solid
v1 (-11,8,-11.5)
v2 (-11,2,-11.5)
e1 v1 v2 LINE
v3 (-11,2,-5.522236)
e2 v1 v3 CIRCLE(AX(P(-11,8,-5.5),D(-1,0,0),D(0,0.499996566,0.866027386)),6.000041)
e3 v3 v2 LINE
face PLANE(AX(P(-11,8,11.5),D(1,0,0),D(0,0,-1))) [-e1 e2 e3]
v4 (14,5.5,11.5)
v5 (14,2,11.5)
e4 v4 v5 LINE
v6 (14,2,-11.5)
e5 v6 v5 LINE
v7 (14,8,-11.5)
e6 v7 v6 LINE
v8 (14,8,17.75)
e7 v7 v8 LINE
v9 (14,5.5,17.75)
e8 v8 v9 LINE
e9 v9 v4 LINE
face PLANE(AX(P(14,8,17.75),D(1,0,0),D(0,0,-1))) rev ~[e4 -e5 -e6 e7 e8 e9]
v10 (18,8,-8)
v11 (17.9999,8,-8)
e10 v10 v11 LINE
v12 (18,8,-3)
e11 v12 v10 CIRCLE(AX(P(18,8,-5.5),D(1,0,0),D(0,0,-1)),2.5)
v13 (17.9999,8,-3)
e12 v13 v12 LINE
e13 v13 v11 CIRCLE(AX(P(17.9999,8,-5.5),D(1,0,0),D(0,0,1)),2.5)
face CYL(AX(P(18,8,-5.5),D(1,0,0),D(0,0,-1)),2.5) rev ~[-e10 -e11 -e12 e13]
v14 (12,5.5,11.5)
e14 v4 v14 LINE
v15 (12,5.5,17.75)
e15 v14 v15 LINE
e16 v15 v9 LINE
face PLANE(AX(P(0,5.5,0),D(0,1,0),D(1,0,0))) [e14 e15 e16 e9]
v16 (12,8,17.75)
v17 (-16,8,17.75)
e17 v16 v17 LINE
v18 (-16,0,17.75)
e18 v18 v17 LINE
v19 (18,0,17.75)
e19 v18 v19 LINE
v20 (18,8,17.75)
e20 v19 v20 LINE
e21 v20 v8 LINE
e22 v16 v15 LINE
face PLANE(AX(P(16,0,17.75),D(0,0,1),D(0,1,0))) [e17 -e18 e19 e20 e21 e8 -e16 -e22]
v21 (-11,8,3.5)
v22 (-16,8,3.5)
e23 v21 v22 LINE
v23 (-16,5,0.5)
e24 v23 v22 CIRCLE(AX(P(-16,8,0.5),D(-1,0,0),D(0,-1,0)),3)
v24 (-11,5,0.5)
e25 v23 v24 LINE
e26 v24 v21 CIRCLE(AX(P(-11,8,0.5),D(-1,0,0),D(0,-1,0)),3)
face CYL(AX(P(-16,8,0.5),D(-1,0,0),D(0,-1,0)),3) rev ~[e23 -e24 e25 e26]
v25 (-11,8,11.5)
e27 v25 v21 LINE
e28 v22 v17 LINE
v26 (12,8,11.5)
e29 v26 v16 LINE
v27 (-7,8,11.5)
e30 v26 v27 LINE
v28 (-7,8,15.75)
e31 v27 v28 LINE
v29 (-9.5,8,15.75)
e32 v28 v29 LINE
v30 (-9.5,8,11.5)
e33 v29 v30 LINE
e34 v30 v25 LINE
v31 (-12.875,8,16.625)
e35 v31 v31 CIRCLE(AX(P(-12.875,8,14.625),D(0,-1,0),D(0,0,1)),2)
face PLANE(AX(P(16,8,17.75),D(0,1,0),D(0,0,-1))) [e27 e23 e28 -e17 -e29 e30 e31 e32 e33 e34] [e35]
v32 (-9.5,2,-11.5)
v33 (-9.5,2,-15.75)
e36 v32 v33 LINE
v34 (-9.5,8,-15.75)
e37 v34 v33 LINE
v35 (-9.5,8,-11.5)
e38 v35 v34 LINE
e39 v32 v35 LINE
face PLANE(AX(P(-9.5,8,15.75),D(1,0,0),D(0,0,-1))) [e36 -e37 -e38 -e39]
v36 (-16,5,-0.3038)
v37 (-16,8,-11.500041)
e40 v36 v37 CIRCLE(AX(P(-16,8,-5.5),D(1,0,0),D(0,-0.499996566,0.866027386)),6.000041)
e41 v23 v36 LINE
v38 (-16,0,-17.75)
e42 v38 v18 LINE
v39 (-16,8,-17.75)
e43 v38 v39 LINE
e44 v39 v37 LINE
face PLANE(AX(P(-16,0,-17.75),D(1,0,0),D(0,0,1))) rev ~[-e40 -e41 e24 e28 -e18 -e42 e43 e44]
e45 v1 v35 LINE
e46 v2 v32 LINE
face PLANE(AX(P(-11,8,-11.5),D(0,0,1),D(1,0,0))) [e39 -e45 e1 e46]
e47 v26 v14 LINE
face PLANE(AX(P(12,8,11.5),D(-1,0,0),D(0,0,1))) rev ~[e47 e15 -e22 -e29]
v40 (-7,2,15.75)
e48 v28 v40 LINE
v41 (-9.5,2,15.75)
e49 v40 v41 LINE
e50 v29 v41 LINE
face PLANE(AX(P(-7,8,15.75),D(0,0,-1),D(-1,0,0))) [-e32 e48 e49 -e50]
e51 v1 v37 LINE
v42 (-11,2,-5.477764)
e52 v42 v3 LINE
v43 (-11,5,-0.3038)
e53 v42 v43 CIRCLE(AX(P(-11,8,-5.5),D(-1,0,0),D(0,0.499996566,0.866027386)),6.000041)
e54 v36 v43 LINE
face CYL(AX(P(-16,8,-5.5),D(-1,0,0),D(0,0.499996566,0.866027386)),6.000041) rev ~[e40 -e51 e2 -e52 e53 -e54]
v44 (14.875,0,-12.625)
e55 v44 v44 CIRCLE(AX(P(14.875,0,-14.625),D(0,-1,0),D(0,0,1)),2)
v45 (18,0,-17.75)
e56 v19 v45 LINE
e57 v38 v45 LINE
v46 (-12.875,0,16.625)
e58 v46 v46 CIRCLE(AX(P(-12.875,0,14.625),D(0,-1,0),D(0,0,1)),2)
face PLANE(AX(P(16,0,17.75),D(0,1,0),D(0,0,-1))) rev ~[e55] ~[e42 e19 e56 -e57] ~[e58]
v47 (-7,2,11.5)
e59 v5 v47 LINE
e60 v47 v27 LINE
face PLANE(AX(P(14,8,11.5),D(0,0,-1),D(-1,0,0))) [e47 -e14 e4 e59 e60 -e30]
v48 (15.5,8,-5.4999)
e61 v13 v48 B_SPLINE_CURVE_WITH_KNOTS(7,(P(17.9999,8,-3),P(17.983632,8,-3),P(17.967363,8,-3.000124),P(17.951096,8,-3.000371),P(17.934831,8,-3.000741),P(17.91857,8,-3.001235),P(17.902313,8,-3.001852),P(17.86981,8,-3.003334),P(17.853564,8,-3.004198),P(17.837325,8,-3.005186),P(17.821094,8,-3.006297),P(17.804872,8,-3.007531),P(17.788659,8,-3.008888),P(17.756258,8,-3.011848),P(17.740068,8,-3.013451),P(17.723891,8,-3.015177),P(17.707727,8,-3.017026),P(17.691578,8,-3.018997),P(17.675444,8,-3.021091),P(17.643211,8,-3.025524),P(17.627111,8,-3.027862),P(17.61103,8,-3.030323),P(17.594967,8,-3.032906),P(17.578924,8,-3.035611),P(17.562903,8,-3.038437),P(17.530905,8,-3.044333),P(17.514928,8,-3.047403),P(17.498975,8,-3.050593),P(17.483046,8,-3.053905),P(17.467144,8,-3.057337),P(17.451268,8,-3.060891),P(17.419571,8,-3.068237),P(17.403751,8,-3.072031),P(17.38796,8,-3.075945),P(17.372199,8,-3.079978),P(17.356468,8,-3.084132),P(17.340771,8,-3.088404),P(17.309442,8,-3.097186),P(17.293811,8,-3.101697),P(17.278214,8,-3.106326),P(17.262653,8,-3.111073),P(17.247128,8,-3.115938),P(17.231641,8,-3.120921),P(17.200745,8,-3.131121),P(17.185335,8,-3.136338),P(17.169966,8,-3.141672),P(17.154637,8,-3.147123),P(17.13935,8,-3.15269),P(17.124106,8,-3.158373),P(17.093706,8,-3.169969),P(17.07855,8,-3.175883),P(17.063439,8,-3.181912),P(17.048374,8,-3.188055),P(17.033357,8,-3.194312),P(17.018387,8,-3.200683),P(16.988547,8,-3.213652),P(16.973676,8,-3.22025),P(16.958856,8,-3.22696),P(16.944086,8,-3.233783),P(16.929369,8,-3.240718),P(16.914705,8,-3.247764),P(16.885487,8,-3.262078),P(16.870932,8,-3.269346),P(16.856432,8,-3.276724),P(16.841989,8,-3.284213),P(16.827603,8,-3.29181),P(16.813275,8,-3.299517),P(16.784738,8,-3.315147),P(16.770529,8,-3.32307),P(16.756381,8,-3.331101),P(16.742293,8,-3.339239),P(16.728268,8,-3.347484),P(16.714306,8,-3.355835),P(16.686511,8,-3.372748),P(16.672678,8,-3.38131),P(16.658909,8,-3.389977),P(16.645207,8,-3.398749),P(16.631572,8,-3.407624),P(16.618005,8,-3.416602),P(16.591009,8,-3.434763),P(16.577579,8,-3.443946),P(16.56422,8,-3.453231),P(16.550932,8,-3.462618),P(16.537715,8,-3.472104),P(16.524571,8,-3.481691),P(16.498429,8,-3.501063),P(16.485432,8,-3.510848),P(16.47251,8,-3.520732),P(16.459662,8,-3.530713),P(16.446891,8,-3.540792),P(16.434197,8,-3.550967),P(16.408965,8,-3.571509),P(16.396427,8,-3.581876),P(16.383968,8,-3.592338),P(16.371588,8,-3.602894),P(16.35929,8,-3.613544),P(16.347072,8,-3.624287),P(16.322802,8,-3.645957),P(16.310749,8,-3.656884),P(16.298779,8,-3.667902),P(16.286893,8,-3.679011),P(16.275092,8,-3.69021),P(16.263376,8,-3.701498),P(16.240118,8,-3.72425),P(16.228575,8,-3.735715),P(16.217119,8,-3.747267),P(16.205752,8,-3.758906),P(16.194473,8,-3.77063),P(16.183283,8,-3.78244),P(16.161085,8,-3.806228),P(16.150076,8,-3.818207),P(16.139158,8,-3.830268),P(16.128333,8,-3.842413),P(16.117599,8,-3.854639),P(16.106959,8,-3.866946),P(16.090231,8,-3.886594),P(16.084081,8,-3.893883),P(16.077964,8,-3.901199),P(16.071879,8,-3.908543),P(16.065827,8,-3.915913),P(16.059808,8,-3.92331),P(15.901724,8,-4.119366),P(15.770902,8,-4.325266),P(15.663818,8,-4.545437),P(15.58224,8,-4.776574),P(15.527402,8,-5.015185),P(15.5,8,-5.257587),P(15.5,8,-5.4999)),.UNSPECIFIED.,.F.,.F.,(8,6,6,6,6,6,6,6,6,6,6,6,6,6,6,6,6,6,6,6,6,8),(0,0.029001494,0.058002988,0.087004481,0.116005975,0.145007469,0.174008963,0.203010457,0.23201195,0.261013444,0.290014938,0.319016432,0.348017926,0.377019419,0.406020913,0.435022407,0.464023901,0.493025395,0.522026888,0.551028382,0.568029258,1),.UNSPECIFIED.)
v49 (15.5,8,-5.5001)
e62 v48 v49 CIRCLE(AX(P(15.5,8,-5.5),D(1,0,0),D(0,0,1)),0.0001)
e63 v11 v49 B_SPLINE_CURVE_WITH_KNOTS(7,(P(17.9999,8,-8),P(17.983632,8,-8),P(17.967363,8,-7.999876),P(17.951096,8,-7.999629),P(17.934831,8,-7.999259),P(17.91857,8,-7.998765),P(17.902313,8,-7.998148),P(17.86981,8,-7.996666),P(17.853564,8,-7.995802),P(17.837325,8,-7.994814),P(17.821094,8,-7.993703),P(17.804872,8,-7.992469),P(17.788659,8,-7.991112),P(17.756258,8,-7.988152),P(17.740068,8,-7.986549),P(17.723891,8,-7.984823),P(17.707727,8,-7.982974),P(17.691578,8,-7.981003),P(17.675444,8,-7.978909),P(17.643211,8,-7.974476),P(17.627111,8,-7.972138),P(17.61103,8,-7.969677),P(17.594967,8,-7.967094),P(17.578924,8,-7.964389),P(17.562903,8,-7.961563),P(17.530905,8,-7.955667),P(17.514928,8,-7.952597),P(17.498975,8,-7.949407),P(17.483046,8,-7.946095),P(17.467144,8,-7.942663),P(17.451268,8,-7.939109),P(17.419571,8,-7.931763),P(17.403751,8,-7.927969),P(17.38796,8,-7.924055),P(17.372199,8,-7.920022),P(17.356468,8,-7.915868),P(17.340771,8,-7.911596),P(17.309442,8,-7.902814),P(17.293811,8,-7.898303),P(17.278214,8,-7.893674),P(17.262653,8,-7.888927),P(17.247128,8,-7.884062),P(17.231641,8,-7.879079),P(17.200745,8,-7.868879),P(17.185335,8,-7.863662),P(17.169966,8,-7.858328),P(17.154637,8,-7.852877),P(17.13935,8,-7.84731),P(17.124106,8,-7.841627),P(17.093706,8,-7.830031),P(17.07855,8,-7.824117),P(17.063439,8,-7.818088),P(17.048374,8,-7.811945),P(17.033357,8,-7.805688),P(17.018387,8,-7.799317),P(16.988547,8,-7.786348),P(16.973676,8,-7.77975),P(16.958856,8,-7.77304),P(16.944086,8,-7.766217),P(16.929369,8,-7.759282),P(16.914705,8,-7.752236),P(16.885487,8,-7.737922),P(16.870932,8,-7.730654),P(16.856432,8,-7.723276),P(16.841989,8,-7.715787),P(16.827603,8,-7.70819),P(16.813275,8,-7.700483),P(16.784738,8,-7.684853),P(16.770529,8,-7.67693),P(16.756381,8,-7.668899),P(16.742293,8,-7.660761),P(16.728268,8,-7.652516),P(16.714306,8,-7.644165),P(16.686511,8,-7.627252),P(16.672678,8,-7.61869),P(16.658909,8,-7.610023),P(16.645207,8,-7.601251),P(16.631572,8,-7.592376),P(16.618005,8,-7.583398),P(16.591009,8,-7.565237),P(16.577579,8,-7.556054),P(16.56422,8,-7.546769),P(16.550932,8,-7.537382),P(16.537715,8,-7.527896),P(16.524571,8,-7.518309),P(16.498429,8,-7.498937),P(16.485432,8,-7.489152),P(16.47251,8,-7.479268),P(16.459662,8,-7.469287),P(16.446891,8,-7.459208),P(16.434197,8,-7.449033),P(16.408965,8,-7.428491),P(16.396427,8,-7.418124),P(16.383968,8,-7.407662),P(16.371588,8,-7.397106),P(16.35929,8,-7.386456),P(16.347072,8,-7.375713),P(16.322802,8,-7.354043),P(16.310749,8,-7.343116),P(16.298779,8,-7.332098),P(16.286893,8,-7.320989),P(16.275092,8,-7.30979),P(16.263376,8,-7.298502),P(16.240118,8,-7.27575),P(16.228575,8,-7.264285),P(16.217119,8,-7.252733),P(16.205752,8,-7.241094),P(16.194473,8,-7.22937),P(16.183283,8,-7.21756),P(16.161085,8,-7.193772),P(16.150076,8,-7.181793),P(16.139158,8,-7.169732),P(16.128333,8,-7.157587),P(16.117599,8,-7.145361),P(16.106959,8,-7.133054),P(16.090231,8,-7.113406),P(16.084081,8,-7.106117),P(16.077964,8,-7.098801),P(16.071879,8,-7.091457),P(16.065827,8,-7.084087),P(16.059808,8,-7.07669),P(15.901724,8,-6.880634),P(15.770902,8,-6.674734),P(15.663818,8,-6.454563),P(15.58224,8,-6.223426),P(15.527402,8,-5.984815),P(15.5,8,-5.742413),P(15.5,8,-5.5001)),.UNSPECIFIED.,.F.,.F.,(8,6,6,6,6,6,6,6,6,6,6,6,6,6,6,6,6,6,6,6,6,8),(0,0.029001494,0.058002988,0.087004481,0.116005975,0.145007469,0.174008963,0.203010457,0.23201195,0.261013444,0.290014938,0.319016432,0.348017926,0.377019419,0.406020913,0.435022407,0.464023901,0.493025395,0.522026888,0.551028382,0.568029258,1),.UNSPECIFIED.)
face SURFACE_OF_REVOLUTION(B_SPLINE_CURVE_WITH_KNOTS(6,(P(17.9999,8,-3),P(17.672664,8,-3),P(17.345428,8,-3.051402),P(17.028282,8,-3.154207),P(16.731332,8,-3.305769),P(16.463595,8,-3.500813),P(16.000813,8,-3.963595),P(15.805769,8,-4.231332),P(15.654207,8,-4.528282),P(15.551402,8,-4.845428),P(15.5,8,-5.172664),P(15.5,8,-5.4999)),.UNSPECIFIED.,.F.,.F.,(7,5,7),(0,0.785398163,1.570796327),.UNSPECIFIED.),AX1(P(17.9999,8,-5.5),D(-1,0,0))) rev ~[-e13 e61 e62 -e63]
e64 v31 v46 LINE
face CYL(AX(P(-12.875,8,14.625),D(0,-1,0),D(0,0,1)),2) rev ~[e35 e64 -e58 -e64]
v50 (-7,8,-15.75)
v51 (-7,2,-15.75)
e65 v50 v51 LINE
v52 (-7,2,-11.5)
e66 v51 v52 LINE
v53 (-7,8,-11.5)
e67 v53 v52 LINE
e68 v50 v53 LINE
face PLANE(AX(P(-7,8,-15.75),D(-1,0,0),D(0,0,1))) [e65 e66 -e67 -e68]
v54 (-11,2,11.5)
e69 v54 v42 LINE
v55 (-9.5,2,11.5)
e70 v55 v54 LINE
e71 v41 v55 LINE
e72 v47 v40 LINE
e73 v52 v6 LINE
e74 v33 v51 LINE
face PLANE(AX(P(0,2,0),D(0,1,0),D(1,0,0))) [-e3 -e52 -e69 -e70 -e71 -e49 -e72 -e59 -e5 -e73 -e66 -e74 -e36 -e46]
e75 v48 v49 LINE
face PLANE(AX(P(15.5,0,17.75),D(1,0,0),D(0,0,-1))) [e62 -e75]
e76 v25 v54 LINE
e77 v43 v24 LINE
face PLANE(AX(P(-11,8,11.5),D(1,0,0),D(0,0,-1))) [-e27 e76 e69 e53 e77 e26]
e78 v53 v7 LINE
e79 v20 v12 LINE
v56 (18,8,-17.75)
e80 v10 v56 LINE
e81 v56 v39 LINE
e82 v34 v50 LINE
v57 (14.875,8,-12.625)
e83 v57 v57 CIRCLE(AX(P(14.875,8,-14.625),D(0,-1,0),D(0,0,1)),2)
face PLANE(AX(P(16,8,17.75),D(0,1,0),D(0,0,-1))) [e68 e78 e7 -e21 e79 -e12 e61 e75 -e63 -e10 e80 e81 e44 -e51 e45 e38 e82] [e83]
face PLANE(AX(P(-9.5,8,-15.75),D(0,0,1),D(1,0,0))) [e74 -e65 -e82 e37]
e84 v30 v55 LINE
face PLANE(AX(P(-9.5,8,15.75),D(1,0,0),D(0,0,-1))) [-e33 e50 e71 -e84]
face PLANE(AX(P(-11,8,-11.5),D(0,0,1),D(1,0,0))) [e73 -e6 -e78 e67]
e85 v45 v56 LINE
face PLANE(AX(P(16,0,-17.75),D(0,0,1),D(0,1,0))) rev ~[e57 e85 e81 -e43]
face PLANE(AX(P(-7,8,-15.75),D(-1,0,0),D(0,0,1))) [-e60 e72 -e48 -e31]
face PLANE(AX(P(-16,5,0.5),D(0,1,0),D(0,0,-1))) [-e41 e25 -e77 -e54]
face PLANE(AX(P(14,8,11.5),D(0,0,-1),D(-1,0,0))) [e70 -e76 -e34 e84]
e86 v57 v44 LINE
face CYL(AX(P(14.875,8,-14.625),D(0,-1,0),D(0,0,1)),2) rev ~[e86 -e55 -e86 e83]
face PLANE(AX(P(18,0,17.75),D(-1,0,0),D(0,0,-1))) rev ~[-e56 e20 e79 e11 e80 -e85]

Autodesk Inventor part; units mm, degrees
ref_plane "YZ Plane" through (0, 0, 0) normal (1, 0, 0) x (0, 1, 0)
ref_plane "XZ Plane" through (0, 0, 0) normal (0, 1, 0) x (-1, 0, 0)
ref_plane "XY Plane" through (0, 0, 0) normal (0, 0, 1) x (1, 0, 0)
sketch "Sketch1" plane through (0, 0, 0) normal (0, 1, 0) x (-1, 0, 0)
  line L0 (16, 17.75) -> (-16, 17.75)
  line L1 (-16, 17.75) -> (-16, -17.75)
  line L2 (-16, -17.75) -> (16, -17.75)
  line L3 (16, -17.75) -> (16, 17.75)
  line L4 (16, 17.75) -> (-16, -17.75) construction
  line L5 (-16, 17.75) -> (16, -17.75) construction
  point P0 (0, 0)
  dimension "d0" = 32
  dimension "d1" = 35.5
extrude "Extrusion1" add sketch "Sketch1" along normal blind 8
sketch "Sketch2" plane through (0, 8, 0) normal (0, 1, 0) x (1, 0, 0)
  line L0 (-11, 11.5) -> (14, 11.5)
  line L1 (14, 11.5) -> (14, -11.5)
  line L2 (14, -11.5) -> (-11, -11.5)
  line L3 (-11, -11.5) -> (-11, 11.5)
  line L4 (-11, 11.5) -> (14, -11.5) construction
  line L5 (14, 11.5) -> (-11, -11.5) construction
  line L6 (16, -17.75) -> (16, 17.75) projected
  point P0 (0, 0)
  point P1 (1.5, 0)
  dimension "d4" = 0
  dimension "d5" = 2
  dimension "d6" = 25
  dimension "d13" = 23
extrude "Extrusion2" cut sketch "Sketch2" against normal blind 6
sketch "Sketch3" plane through (0, 8, 0) normal (0, 1, 0) x (1, 0, 0)
  line L0 (-7, -15.75) -> (-9.5, -15.75)
  line L1 (-9.5, -15.75) -> (-9.5, 15.75)
  line L2 (-9.5, 15.75) -> (-7, 15.75)
  line L3 (-7, 15.75) -> (-7, -15.75)
  line L4 (-7, -15.75) -> (-9.5, 15.75) construction
  line L5 (-9.5, -15.75) -> (-7, 15.75) construction
  line L6 (14, 11.5) -> (14, -11.5) projected
  point P0 (0, 0)
  point P1 (-8.25, 0)
  dimension "d9" = 21
  dimension "d10" = 2.5
  dimension "d11" = 0
  dimension "d12" = 31.5
extrude "Extrusion3" cut sketch "Sketch3" against normal blind 6
sketch "Sketch4" plane through (-16, 0, -17.75) normal (-1, 0, 0) x (0, 0, 1)
  line L0 (6.25, 8) -> (6.25, 2) projected
  line L1 (6.25, 8) -> (29.25, 8) projected
  line L2 (6.25, 2) -> (29.25, 2) projected
  line L3 (18.25, 5) -> (17.4462, 5)
  line L4 (18.25, 11) -> (17.4462, 11)
  arc A0 (18.25, 5) -> (18.25, 11) centre (18.25, 8) ccw
  arc A1 (17.4462, 11) -> (17.4462, 5) centre (12.25, 8) ccw
  arc A2 (18.25, 8) -> (17.5, 10.9047) centre (12.25, 8) ccw
  point P0 (17.75, 0)
  dimension "d17" = 6
extrude "Extrusion4" cut sketch "Sketch4" against normal up to surface (30 mm away) contours A1 L4 A0 L1 | L1 A0 L3 A1
thicken "Thicken1" operation add thickness 2 both sides no extend neighbours yes toward (1, 0, 0) faces at (16, 5.3333, 5.9167)
sketch "Sketch6" plane through (18, 0, 17.75) normal (1, 0, 0) x (0, 0, -1)
  arc A0 (18.0538, 5) -> (29.25, 8) centre (23.25, 8) ccw projected
  circle A1 centre (23.25, 8) radius 2.5
  point P0 (17.75, 0)
  dimension "d26" = 5
extrude "Extrusion6" cut sketch "Sketch6" against normal blind 2.5
fillet "Fillet2" radius 2.5 1 edges at (15.5, 5.5, -5.5)
sketch "Sketch7" plane through (0, 8, 0) normal (0, 1, 0) x (1, 0, 0)
  arc A0 (18, 8) -> (18, 3) centre (18, 5.5) ccw projected
  line L0 (18, 8) -> (18, 17.75) projected
  line L1 (18, 17.75) -> (-16, 17.75) projected
  line L2 (-16, 17.75) -> (-16, 11.5) projected
  line L3 (-16, 11.5) -> (-11, 11.5) projected
  line L4 (-11, 11.5) -> (-9.5, 11.5) projected
  line L5 (-9.5, 11.5) -> (-9.5, 15.75) projected
  line L6 (-9.5, 15.75) -> (-7, 15.75) projected
  line L7 (-7, 15.75) -> (-7, 11.5) projected
  line L8 (-7, 11.5) -> (14, 11.5) projected
  line L9 (14, 11.5) -> (14, -11.5) projected
  line L10 (14, -11.5) -> (-7, -11.5) projected
  line L11 (-7, -11.5) -> (-7, -15.75) projected
  line L12 (-7, -15.75) -> (-9.5, -15.75) projected
  line L13 (-9.5, -15.75) -> (-9.5, -11.5) projected
  line L14 (-9.5, -11.5) -> (-11, -11.5) projected
  line L15 (-11, -11.5) -> (-11, -3.5) projected
  line L16 (-11, -3.5) -> (-16, -3.5) projected
  line L17 (-16, -3.5) -> (-16, -17.75) projected
  line L18 (-16, -17.75) -> (18, -17.75) projected
  line L19 (18, -17.75) -> (18, 3) projected
  line L20 (-16, -17.75) -> (18, -17.75) projected
  line L21 (14, -11.5) -> (12, -11.5)
  line L22 (12, -11.5) -> (12, -17.75)
  line L23 (12, -17.75) -> (14, -17.75)
  line L24 (14, -17.75) -> (14, -11.5)
  point P0 (0, 0)
  dimension "d30" = 2
extrude "Extrusion7" cut sketch "Sketch7" against normal blind 2.5 contours L18 L22 L10 L24
sketch "Sketch8" plane through (0, 8, 0) normal (0, 1, 0) x (1, 0, 0)
  line L0 (18, 17.75) -> (-16, 17.75) projected
  line L1 (18, 8) -> (18, 17.75) projected
  line L2 (-16, -17.75) -> (12, -17.75) projected
  line L3 (-16, -3.5) -> (-16, -17.75) projected
  point P0 (0, 0)
  point P1 (14.875, 14.625)
  point P2 (-12.875, -14.625)
  dimension "d33" = 3.125
  dimension "d34" = 3.125
  dimension "d35" = 3.125
  dimension "d36" = 3.125
hole "Hole1" at (14.875, 8, -14.625) at (-12.875, 8, 14.625) direction (0, -1, 0) diameter 4 end through all
properties part number "knee_motor_hemi"
